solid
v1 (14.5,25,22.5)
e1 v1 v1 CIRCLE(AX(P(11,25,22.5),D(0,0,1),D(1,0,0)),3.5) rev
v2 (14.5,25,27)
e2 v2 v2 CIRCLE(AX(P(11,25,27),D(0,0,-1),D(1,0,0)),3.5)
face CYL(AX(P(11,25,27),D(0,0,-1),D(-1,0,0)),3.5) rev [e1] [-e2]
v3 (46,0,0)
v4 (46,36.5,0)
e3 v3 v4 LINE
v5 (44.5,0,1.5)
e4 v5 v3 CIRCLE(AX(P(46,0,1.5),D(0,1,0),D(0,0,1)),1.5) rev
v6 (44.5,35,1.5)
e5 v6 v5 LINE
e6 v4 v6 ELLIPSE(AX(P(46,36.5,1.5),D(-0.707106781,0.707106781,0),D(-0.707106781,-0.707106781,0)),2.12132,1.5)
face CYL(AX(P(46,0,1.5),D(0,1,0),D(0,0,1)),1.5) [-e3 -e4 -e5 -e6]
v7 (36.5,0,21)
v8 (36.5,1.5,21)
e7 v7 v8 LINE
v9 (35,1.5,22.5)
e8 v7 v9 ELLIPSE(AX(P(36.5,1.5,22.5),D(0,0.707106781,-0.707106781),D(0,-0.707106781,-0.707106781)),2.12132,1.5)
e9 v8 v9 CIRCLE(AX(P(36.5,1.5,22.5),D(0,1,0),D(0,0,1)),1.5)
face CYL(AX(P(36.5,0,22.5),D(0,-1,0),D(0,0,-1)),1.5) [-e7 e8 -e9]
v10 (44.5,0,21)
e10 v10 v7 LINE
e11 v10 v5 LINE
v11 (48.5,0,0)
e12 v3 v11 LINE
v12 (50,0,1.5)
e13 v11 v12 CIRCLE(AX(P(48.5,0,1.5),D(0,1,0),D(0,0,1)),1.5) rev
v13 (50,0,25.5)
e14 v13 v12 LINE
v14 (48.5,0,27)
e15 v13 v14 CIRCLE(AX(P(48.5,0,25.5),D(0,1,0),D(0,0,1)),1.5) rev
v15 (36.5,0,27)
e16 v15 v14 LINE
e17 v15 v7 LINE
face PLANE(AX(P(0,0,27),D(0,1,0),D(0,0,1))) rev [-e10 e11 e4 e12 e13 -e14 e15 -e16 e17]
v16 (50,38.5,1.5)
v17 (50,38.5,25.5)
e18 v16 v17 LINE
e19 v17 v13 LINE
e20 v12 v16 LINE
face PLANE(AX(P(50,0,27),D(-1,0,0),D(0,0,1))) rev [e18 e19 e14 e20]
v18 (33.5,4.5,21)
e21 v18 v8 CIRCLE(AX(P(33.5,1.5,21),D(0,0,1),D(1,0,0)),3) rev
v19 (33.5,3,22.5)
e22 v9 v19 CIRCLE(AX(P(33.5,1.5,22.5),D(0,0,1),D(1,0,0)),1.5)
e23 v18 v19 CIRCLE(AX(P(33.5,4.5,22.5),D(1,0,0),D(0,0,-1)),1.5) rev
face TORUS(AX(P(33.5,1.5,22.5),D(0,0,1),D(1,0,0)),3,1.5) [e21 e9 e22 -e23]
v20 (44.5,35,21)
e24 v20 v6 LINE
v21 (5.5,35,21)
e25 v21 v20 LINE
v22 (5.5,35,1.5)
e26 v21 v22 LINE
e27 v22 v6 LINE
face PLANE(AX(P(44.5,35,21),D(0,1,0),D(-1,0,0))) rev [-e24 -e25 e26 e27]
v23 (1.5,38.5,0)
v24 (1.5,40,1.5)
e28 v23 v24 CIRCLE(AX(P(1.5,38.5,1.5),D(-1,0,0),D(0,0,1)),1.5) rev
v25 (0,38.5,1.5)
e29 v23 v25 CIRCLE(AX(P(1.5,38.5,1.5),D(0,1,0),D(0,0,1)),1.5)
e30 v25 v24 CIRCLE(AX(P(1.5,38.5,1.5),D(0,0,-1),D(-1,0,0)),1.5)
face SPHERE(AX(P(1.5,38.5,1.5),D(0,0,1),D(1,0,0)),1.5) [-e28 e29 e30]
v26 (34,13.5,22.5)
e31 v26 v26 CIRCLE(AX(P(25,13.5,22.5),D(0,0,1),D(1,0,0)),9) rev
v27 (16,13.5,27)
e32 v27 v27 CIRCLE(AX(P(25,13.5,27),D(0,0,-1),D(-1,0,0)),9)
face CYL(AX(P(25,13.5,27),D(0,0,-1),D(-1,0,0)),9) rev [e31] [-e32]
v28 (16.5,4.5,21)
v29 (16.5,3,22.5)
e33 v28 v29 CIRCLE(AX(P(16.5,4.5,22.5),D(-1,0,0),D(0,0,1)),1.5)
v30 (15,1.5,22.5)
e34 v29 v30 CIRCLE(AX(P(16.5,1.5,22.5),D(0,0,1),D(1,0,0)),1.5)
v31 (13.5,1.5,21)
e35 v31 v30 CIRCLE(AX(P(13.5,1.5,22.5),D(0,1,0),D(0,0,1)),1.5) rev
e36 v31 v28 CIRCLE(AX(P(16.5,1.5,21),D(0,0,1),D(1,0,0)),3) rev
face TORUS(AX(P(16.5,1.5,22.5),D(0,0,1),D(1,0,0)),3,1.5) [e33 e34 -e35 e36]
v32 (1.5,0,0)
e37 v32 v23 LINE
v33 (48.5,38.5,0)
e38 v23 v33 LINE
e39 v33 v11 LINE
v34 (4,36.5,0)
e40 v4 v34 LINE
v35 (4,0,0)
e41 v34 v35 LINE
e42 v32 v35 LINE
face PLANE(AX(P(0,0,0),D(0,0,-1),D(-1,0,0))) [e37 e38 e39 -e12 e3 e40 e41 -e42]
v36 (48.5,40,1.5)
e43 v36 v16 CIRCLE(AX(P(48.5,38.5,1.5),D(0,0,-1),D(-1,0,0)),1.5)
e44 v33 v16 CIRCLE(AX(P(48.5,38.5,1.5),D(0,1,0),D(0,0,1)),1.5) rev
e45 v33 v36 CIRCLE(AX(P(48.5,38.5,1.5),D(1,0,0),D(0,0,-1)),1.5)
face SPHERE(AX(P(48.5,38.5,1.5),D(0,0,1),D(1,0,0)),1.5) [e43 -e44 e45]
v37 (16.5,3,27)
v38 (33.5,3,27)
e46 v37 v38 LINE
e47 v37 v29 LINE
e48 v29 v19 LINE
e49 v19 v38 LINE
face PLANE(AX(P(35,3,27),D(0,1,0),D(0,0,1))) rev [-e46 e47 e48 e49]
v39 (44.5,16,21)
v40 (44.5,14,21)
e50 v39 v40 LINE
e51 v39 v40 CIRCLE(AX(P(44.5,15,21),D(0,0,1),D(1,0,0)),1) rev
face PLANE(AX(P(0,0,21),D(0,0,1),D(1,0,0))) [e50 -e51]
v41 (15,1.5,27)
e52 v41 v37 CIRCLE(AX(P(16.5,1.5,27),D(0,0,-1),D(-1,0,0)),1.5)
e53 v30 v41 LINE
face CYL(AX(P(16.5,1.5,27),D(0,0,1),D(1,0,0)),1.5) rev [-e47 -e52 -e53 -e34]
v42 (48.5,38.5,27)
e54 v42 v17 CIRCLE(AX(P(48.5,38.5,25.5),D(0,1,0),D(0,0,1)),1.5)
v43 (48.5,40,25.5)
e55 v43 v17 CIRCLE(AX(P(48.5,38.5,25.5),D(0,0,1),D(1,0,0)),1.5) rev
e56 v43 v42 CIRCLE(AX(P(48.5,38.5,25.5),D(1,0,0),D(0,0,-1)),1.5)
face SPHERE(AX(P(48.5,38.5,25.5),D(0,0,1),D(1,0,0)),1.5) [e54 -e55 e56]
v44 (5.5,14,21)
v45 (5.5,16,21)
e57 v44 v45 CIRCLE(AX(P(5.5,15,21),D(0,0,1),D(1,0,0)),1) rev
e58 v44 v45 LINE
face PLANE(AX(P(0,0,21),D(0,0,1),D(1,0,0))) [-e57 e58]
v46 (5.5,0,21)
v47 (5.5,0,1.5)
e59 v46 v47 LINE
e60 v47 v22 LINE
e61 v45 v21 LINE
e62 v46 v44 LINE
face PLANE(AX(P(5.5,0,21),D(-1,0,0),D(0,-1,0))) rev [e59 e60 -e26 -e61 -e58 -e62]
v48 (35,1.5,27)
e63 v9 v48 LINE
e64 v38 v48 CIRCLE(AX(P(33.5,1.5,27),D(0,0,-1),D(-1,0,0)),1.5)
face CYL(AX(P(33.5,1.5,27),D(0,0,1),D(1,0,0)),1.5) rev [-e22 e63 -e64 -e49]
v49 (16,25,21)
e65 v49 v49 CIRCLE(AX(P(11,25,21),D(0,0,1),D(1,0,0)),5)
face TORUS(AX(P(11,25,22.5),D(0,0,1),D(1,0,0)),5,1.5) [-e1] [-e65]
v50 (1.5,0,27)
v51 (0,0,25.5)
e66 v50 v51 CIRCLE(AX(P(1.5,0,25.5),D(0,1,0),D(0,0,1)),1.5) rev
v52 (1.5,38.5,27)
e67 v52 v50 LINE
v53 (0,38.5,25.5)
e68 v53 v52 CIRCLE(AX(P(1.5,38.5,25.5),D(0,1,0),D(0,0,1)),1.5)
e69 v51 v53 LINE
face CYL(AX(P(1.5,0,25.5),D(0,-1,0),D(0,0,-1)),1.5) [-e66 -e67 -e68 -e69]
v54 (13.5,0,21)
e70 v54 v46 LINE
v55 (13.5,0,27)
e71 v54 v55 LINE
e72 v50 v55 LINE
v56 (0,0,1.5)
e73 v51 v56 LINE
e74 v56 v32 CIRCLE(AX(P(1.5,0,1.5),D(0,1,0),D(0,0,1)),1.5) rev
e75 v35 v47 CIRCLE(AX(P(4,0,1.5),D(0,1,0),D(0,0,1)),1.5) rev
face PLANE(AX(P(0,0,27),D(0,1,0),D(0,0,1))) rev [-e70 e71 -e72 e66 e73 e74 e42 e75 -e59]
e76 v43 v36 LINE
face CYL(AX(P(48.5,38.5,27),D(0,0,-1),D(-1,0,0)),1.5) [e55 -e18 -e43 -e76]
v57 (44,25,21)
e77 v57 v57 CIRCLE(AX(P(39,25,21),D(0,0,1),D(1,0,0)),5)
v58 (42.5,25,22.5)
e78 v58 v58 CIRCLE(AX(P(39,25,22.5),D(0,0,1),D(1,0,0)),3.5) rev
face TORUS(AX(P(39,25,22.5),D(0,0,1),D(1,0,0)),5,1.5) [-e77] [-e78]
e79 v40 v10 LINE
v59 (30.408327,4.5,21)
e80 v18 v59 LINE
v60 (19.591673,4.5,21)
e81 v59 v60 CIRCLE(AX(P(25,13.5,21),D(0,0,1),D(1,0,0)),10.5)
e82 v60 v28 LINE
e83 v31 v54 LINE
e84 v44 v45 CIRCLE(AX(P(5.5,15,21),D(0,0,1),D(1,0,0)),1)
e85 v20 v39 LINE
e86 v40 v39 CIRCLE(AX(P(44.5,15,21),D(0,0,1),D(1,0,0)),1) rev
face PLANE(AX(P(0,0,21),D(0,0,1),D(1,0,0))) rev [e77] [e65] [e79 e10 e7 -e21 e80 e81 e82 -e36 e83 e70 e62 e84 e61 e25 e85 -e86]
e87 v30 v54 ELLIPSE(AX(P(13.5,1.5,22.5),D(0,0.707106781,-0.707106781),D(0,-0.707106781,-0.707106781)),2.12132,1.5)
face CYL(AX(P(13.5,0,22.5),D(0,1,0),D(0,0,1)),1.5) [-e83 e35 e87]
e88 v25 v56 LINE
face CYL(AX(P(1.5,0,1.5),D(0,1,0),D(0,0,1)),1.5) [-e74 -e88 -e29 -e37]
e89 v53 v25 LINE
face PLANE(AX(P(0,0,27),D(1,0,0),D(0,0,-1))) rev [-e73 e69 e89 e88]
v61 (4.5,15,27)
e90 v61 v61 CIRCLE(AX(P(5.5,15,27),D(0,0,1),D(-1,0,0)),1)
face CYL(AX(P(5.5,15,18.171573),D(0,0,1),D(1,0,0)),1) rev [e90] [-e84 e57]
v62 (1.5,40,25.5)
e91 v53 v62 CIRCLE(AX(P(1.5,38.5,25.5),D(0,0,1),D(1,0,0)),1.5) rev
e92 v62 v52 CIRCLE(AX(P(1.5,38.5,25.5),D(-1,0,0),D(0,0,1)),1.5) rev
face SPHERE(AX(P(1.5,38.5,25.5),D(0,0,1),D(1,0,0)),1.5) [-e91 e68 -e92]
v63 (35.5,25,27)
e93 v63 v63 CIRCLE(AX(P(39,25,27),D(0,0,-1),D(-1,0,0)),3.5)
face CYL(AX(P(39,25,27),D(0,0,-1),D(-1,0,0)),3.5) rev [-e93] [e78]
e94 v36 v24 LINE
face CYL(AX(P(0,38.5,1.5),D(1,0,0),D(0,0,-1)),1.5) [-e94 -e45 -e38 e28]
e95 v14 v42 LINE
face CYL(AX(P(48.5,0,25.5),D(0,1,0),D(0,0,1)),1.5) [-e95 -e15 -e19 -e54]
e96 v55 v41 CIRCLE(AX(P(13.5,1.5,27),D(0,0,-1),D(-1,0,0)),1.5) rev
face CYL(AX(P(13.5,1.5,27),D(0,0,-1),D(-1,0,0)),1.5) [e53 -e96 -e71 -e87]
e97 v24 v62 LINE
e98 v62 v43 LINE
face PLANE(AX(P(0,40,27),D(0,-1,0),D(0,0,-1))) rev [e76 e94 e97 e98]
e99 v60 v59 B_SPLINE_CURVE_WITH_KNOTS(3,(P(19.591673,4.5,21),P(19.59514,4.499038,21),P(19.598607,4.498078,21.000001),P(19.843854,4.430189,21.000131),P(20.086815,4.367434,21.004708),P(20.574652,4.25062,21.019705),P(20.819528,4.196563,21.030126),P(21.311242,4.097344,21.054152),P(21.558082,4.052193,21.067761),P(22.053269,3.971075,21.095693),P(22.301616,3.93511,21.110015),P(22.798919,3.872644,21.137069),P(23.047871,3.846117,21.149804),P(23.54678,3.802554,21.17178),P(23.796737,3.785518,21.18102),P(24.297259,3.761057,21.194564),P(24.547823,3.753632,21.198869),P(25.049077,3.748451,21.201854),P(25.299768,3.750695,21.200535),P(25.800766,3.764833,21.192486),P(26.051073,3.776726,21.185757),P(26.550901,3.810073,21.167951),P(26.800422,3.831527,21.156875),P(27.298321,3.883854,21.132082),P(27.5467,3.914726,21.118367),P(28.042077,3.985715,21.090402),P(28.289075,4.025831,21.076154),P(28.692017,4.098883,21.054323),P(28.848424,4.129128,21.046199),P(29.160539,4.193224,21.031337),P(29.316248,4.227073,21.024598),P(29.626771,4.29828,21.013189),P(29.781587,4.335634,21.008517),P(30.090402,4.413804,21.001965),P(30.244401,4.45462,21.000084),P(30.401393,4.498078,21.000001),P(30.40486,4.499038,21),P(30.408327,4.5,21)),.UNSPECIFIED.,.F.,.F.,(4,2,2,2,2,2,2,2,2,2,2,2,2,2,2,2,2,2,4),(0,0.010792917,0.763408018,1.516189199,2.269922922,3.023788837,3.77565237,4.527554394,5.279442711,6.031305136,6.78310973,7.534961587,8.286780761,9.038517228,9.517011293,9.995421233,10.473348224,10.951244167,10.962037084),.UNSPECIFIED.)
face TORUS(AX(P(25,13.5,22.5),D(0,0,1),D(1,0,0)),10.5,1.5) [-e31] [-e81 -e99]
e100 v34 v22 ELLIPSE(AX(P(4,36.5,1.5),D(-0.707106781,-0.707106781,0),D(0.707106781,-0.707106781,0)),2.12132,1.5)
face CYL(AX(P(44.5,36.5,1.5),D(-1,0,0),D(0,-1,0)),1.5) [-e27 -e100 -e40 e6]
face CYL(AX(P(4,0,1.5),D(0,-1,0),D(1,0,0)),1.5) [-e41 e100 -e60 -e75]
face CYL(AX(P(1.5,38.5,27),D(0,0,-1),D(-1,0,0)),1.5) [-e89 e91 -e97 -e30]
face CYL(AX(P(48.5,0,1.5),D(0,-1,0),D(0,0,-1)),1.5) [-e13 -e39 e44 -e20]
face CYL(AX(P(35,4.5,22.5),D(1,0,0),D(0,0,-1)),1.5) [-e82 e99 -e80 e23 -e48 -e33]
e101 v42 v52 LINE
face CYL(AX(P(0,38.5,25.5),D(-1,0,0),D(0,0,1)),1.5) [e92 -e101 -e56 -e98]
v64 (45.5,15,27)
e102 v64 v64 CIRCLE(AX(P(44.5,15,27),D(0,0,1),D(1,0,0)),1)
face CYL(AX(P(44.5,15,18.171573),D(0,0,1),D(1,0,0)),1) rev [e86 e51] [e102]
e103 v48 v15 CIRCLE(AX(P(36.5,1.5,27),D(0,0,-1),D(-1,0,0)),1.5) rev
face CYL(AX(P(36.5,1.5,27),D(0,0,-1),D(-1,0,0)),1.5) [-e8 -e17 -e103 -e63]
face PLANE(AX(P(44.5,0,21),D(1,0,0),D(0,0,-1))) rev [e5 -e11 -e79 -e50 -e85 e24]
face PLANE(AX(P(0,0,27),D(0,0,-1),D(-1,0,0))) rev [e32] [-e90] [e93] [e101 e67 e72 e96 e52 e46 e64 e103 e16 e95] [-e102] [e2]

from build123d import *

# Parameters (mm, degrees)
SKETCH1_W           = 50
SKETCH1_H           = 40
BOSS_EXTRUDE1_DEPTH = 27
SKETCH2_W           = 39
SKETCH2_H           = 35
CUT_EXTRUDE1_DEPTH  = 21
SKETCH3_R           = 9
SKETCH3_R_2         = 3.5
SKETCH3_W           = 20
SKETCH3_H           = 3
CUT_EXTRUDE2_DEPTH  = 68.386942355
SKETCH4_R           = 1
CUT_EXTRUDE3_DEPTH  = 6
FILLET1_R           = 1.5


with BuildPart() as part:
    # Sketch1 → Boss-Extrude1 (new body)
    with BuildSketch(Plane.XY):
        with Locations((25, 20)):
            Rectangle(SKETCH1_W, SKETCH1_H)
    extrude(amount=BOSS_EXTRUDE1_DEPTH)

    # Sketch2 → Cut-Extrude1 (cut)
    with BuildSketch(Plane(origin=(0, 0, 0), x_dir=(-1, 0, 0), z_dir=(0, 0, -1))):
        with Locations((-25, 17.5)):
            Rectangle(SKETCH2_W, SKETCH2_H)
    extrude(amount=-CUT_EXTRUDE1_DEPTH, mode=Mode.SUBTRACT)

    # Sketch3 → Cut-Extrude2 (cut, through all)
    with BuildSketch(Plane(origin=(0, 0, 21), x_dir=(-1, 0, 0), z_dir=(0, 0, -1))):
        with Locations((-25, 13.5)):
            Circle(SKETCH3_R)
        with Locations((-39, 25)):
            Circle(SKETCH3_R_2)
        with Locations(Location((-11, 25, 0), (0, 0, 180))):
            Circle(SKETCH3_R_2)
        with Locations((-25, 1.5)):
            Rectangle(SKETCH3_W, SKETCH3_H)
    extrude(amount=-CUT_EXTRUDE2_DEPTH, mode=Mode.SUBTRACT)

    # Sketch4 → Cut-Extrude3 (cut)
    with BuildSketch(Plane.XY.offset(27)):
        with Locations((44.5, 15)):
            Circle(SKETCH4_R)
        with Locations(Location((5.5, 15, 0), (0, 0, 90))):
            Circle(SKETCH4_R)
    extrude(amount=-CUT_EXTRUDE3_DEPTH, mode=Mode.SUBTRACT)

    # Fillet1
    # the kernel refuses this fillet: 1.5 mm, written as the material it adds along each edge
    with BuildSketch(Plane(origin=(15, 3, 21), x_dir=(0, -1, 0), z_dir=(0, 0, 1)), Plane(origin=(35, 3, 21), x_dir=(-1, 0, 0), z_dir=(0, 0, 1))) as fillet1_piece_1:
        with BuildLine():
            CenterArc((FILLET1_R, FILLET1_R), FILLET1_R, 180, 90)
            Line((0, FILLET1_R), (0, 0))
            Line((0, 0), (FILLET1_R, 0))
        make_face()
    extrude(amount=6)
    # the kernel refuses this fillet: 1.5 mm, written as the material it takes off along each edge
    with BuildSketch(Plane(origin=(48.5, 38.5, 1.5), x_dir=(0, 0, -1), z_dir=(1, 0, 0))) as fillet1_2_piece_1_section:
        Polygon((0, 0), (FILLET1_R, 0), (FILLET1_R, FILLET1_R), (0, FILLET1_R), align=None)
    fillet1_2_piece_1 = extrude(amount=FILLET1_R, mode=Mode.PRIVATE)
    fillet1_2_piece_1 = fillet1_2_piece_1 - Plane(origin=(48.5, 38.5, 1.5), x_dir=(0, -0.7071067811865475, 0.7071067811865475), z_dir=(1, 0, 0)) * Sphere(FILLET1_R, mode=Mode.PRIVATE)
    add(fillet1_2_piece_1, mode=Mode.SUBTRACT)
    with BuildSketch(Plane(origin=(1.5, 38.5, 1.5), x_dir=(-1, 0, 0), z_dir=(0, 0, -1))) as fillet1_2_piece_2_section:
        Polygon((0, 0), (FILLET1_R, 0), (FILLET1_R, FILLET1_R), (0, FILLET1_R), align=None)
    fillet1_2_piece_2 = extrude(amount=FILLET1_R, mode=Mode.PRIVATE)
    fillet1_2_piece_2 = fillet1_2_piece_2 - Plane(origin=(1.5, 38.5, 1.5), x_dir=(0.7071067811865475, -0.7071067811865475, 0), z_dir=(0, 0, -1)) * Sphere(FILLET1_R, mode=Mode.PRIVATE)
    add(fillet1_2_piece_2, mode=Mode.SUBTRACT)
    with BuildSketch(Plane(origin=(1.5, 38.5, 25.5), x_dir=(-1, 0, 0), z_dir=(0, 0, 1))) as fillet1_2_piece_3_section:
        Polygon((0, 0), (FILLET1_R, 0), (FILLET1_R, -FILLET1_R), (0, -FILLET1_R), align=None)
    fillet1_2_piece_3 = extrude(amount=FILLET1_R, mode=Mode.PRIVATE)
    fillet1_2_piece_3 = fillet1_2_piece_3 - Plane(origin=(1.5, 38.5, 25.5), x_dir=(0.7071067811865475, -0.7071067811865475, 0), z_dir=(0, 0, 1)) * Sphere(FILLET1_R, mode=Mode.PRIVATE)
    add(fillet1_2_piece_3, mode=Mode.SUBTRACT)
    with BuildSketch(Plane(origin=(48.5, 38.5, 25.5), x_dir=(0, 0, 1), z_dir=(1, 0, 0))) as fillet1_2_piece_4_section:
        Polygon((0, 0), (FILLET1_R, 0), (FILLET1_R, -FILLET1_R), (0, -FILLET1_R), align=None)
    fillet1_2_piece_4 = extrude(amount=FILLET1_R, mode=Mode.PRIVATE)
    fillet1_2_piece_4 = fillet1_2_piece_4 - Plane(origin=(48.5, 38.5, 25.5), x_dir=(0, -0.7071067811865475, -0.7071067811865475), z_dir=(1, 0, 0)) * Sphere(FILLET1_R, mode=Mode.PRIVATE)
    add(fillet1_2_piece_4, mode=Mode.SUBTRACT)
    with BuildSketch(Plane(origin=(15, 0, 17.25), x_dir=(-1, 0, 0), z_dir=(0, 0, 1))) as fillet1_2_piece_5:
        with BuildLine():
            CenterArc((FILLET1_R, -FILLET1_R), FILLET1_R, 90, 90)
            Line((0, -FILLET1_R), (0, 0))
            Line((0, 0), (FILLET1_R, 0))
        make_face()
    extrude(amount=13.5, mode=Mode.SUBTRACT)
    with BuildSketch(Plane(origin=(35, 0, 17.25), x_dir=(1, 0, 0), z_dir=(0, 0, 1))) as fillet1_2_piece_6:
        with BuildLine():
            CenterArc((FILLET1_R, FILLET1_R), FILLET1_R, 180, 90)
            Line((0, FILLET1_R), (0, 0))
            Line((0, 0), (FILLET1_R, 0))
        make_face()
    extrude(amount=13.5, mode=Mode.SUBTRACT)
    with BuildSketch(Plane(origin=(15, -3.75, 21), x_dir=(-1, 0, 0), z_dir=(0, 1, 0)), Plane(origin=(35, 1.5, 21), x_dir=(1, 0, 0), z_dir=(0, -1, 0))) as fillet1_2_piece_7:
        with BuildLine():
            CenterArc((FILLET1_R, FILLET1_R), FILLET1_R, 180, 90)
            Line((0, FILLET1_R), (0, 0))
            Line((0, 0), (FILLET1_R, 0))
        make_face()
    extrude(amount=5.25, mode=Mode.SUBTRACT)
    with BuildSketch(Plane(origin=(16.5, 3, 21), x_dir=(0, 1, 0), z_dir=(1, 0, 0))) as fillet1_2_piece_8:
        with BuildLine():
            CenterArc((FILLET1_R, FILLET1_R), FILLET1_R, 180, 90)
            Line((0, FILLET1_R), (0, 0))
            Line((0, 0), (FILLET1_R, 0))
        make_face()
    extrude(amount=17, mode=Mode.SUBTRACT)
    with BuildSketch(Plane(origin=(39, 25, 21), x_dir=(-1, 0, 0), z_dir=(0, -1, 0))) as fillet1_2_piece_9:
        with BuildLine():
            CenterArc((3.5 + FILLET1_R, -FILLET1_R), FILLET1_R, 90, 90)
            Line((3.5, -FILLET1_R), (3.5, 0))
            Line((3.5, 0), (3.5 + FILLET1_R, 0))
        make_face()
    revolve(axis=Axis((39, 25, 21), (0, 0, -1)), mode=Mode.SUBTRACT)
    with BuildSketch(Plane(origin=(11, 25, 21), x_dir=(1, 0, 0), z_dir=(0, 1, 0))) as fillet1_2_piece_10:
        with BuildLine():
            CenterArc((3.5 + FILLET1_R, -FILLET1_R), FILLET1_R, 90, 90)
            Line((3.5, -FILLET1_R), (3.5, 0))
            Line((3.5, 0), (3.5 + FILLET1_R, 0))
        make_face()
    revolve(axis=Axis((11, 25, 21), (0, 0, -1)), mode=Mode.SUBTRACT)
    with BuildSketch(Plane(origin=(25, 13.5, 21), x_dir=(-1, 0, 0), z_dir=(0, -1, 0))) as fillet1_2_piece_11:
        with BuildLine():
            CenterArc((9 + FILLET1_R, -FILLET1_R), FILLET1_R, 90, 90)
            Line((9, -FILLET1_R), (9, 0))
            Line((9, 0), (9 + FILLET1_R, 0))
        make_face()
    revolve(axis=Axis((25, 13.5, 21), (0, 0, -1)), mode=Mode.SUBTRACT)
    with BuildSketch(Plane(origin=(5.5, -3.75, 0), x_dir=(-1, 0, 0), z_dir=(0, 1, 0)), Plane(origin=(44.5, 35, 0), x_dir=(1, 0, 0), z_dir=(0, -1, 0))) as fillet1_2_piece_12:
        with BuildLine():
            CenterArc((FILLET1_R, FILLET1_R), FILLET1_R, 180, 90)
            Line((0, FILLET1_R), (0, 0))
            Line((0, 0), (FILLET1_R, 0))
        make_face()
    extrude(amount=38.75, mode=Mode.SUBTRACT)
    with BuildSketch(Plane(origin=(5.5, 35, 0), x_dir=(0, 1, 0), z_dir=(1, 0, 0))) as fillet1_2_piece_13:
        with BuildLine():
            CenterArc((FILLET1_R, FILLET1_R), FILLET1_R, 180, 90)
            Line((0, FILLET1_R), (0, 0))
            Line((0, 0), (FILLET1_R, 0))
        make_face()
    extrude(amount=39, mode=Mode.SUBTRACT)
    with BuildSketch(Plane(origin=(50, -3.75, 0), x_dir=(-1, 0, 0), z_dir=(0, 1, 0)), Plane(origin=(0, 38.5, 0), x_dir=(1, 0, 0), z_dir=(0, -1, 0))) as fillet1_2_piece_14:
        with BuildLine():
            CenterArc((FILLET1_R, FILLET1_R), FILLET1_R, 180, 90)
            Line((0, FILLET1_R), (0, 0))
            Line((0, 0), (FILLET1_R, 0))
        make_face()
    extrude(amount=42.25, mode=Mode.SUBTRACT)
    with BuildSketch(Plane(origin=(48.5, 40, 0), x_dir=(0, -1, 0), z_dir=(-1, 0, 0))) as fillet1_2_piece_15:
        with BuildLine():
            CenterArc((FILLET1_R, FILLET1_R), FILLET1_R, 180, 90)
            Line((0, FILLET1_R), (0, 0))
            Line((0, 0), (FILLET1_R, 0))
        make_face()
    extrude(amount=47, mode=Mode.SUBTRACT)
    with BuildSketch(Plane(origin=(0, 40, 1.5), x_dir=(0, -1, 0), z_dir=(0, 0, 1)), Plane(origin=(50, 40, 1.5), x_dir=(-1, 0, 0), z_dir=(0, 0, 1))) as fillet1_2_piece_16:
        with BuildLine():
            CenterArc((FILLET1_R, FILLET1_R), FILLET1_R, 180, 90)
            Line((0, FILLET1_R), (0, 0))
            Line((0, 0), (FILLET1_R, 0))
        make_face()
    extrude(amount=24, mode=Mode.SUBTRACT)
    with BuildSketch(Plane(origin=(0, 38.5, 27), x_dir=(1, 0, 0), z_dir=(0, -1, 0)), Plane(origin=(50, -3.75, 27), x_dir=(-1, 0, 0), z_dir=(0, 1, 0))) as fillet1_2_piece_17:
        with BuildLine():
            CenterArc((FILLET1_R, -FILLET1_R), FILLET1_R, 90, 90)
            Line((0, -FILLET1_R), (0, 0))
            Line((0, 0), (FILLET1_R, 0))
        make_face()
    extrude(amount=42.25, mode=Mode.SUBTRACT)
    with BuildSketch(Plane(origin=(48.5, 40, 27), x_dir=(0, -1, 0), z_dir=(-1, 0, 0))) as fillet1_2_piece_18:
        with BuildLine():
            CenterArc((FILLET1_R, -FILLET1_R), FILLET1_R, 90, 90)
            Line((0, -FILLET1_R), (0, 0))
            Line((0, 0), (FILLET1_R, 0))
        make_face()
    extrude(amount=47, mode=Mode.SUBTRACT)
    with BuildSketch(Plane(origin=(16.5, 1.5, 21), x_dir=(-1, 0, 0), z_dir=(0, -1, 0))) as fillet1_2_piece_19:
        with BuildLine():
            CenterArc((1.5 + FILLET1_R, -FILLET1_R), FILLET1_R, 90, 90)
            Line((1.5, -FILLET1_R), (1.5, 0))
            Line((1.5, 0), (1.5 + FILLET1_R, 0))
        make_face()
    revolve(axis=Axis((16.5, 1.5, 21), (0, 0, -1)), revolution_arc=90, mode=Mode.SUBTRACT)
    with BuildSketch(Plane(origin=(33.5, 1.5, 21), x_dir=(0, 1, 0), z_dir=(-1, 0, 0))) as fillet1_2_piece_20:
        with BuildLine():
            CenterArc((1.5 + FILLET1_R, -FILLET1_R), FILLET1_R, 90, 90)
            Line((1.5, -FILLET1_R), (1.5, 0))
            Line((1.5, 0), (1.5 + FILLET1_R, 0))
        make_face()
    revolve(axis=Axis((33.5, 1.5, 21), (0, 0, -1)), revolution_arc=90, mode=Mode.SUBTRACT)
    with BuildSketch(Plane(origin=(1.75, 35, 0), x_dir=(0, 1, 0), z_dir=(1, 0, 0))) as fillet1_2_piece_21a_section:
        with BuildLine():
            CenterArc((FILLET1_R, FILLET1_R), FILLET1_R, 180, 90)
            Line((0, FILLET1_R), (0, 0))
            Line((0, 0), (FILLET1_R, 0))
        make_face()
    fillet1_2_piece_21a = extrude(amount=42.75, mode=Mode.PRIVATE)
    fillet1_2_piece_21a = split(fillet1_2_piece_21a, bisect_by=Plane(origin=(5.5, 35.339592671, 0.339592671), z_dir=(-1, 0, 0)), keep=Keep.TOP, mode=Mode.PRIVATE)
    with BuildSketch(Plane(origin=(5.5, -3.75, 0), x_dir=(-1, 0, 0), z_dir=(0, 1, 0))) as fillet1_2_piece_21b_section:
        with BuildLine():
            CenterArc((FILLET1_R, FILLET1_R), FILLET1_R, 180, 90)
            Line((0, FILLET1_R), (0, 0))
            Line((0, 0), (FILLET1_R, 0))
        make_face()
    fillet1_2_piece_21b = extrude(amount=42.5, mode=Mode.PRIVATE)
    fillet1_2_piece_21b = split(fillet1_2_piece_21b, bisect_by=Plane(origin=(5.160407329, 35, 0.339592671), z_dir=(0, 1, 0)), keep=Keep.TOP, mode=Mode.PRIVATE)
    fillet1_2_piece_21 = fillet1_2_piece_21a & fillet1_2_piece_21b
    add(fillet1_2_piece_21, mode=Mode.SUBTRACT)
    with BuildSketch(Plane(origin=(44.5, 38.75, 0), x_dir=(1, 0, 0), z_dir=(0, -1, 0))) as fillet1_2_piece_22a_section:
        with BuildLine():
            CenterArc((FILLET1_R, FILLET1_R), FILLET1_R, 180, 90)
            Line((0, FILLET1_R), (0, 0))
            Line((0, 0), (FILLET1_R, 0))
        make_face()
    fillet1_2_piece_22a = extrude(amount=42.5, mode=Mode.PRIVATE)
    fillet1_2_piece_22a = split(fillet1_2_piece_22a, bisect_by=Plane(origin=(44.839592671, 35, 0.339592671), z_dir=(0, 1, 0)), keep=Keep.TOP, mode=Mode.PRIVATE)
    with BuildSketch(Plane(origin=(5.5, 35, 0), x_dir=(0, 1, 0), z_dir=(1, 0, 0))) as fillet1_2_piece_22b_section:
        with BuildLine():
            CenterArc((FILLET1_R, FILLET1_R), FILLET1_R, 180, 90)
            Line((0, FILLET1_R), (0, 0))
            Line((0, 0), (FILLET1_R, 0))
        make_face()
    fillet1_2_piece_22b = extrude(amount=42.75, mode=Mode.PRIVATE)
    fillet1_2_piece_22b = split(fillet1_2_piece_22b, bisect_by=Plane(origin=(44.5, 35.339592671, 0.339592671), z_dir=(1, 0, 0)), keep=Keep.TOP, mode=Mode.PRIVATE)
    fillet1_2_piece_22 = fillet1_2_piece_22a & fillet1_2_piece_22b
    add(fillet1_2_piece_22, mode=Mode.SUBTRACT)


solid = part.part
